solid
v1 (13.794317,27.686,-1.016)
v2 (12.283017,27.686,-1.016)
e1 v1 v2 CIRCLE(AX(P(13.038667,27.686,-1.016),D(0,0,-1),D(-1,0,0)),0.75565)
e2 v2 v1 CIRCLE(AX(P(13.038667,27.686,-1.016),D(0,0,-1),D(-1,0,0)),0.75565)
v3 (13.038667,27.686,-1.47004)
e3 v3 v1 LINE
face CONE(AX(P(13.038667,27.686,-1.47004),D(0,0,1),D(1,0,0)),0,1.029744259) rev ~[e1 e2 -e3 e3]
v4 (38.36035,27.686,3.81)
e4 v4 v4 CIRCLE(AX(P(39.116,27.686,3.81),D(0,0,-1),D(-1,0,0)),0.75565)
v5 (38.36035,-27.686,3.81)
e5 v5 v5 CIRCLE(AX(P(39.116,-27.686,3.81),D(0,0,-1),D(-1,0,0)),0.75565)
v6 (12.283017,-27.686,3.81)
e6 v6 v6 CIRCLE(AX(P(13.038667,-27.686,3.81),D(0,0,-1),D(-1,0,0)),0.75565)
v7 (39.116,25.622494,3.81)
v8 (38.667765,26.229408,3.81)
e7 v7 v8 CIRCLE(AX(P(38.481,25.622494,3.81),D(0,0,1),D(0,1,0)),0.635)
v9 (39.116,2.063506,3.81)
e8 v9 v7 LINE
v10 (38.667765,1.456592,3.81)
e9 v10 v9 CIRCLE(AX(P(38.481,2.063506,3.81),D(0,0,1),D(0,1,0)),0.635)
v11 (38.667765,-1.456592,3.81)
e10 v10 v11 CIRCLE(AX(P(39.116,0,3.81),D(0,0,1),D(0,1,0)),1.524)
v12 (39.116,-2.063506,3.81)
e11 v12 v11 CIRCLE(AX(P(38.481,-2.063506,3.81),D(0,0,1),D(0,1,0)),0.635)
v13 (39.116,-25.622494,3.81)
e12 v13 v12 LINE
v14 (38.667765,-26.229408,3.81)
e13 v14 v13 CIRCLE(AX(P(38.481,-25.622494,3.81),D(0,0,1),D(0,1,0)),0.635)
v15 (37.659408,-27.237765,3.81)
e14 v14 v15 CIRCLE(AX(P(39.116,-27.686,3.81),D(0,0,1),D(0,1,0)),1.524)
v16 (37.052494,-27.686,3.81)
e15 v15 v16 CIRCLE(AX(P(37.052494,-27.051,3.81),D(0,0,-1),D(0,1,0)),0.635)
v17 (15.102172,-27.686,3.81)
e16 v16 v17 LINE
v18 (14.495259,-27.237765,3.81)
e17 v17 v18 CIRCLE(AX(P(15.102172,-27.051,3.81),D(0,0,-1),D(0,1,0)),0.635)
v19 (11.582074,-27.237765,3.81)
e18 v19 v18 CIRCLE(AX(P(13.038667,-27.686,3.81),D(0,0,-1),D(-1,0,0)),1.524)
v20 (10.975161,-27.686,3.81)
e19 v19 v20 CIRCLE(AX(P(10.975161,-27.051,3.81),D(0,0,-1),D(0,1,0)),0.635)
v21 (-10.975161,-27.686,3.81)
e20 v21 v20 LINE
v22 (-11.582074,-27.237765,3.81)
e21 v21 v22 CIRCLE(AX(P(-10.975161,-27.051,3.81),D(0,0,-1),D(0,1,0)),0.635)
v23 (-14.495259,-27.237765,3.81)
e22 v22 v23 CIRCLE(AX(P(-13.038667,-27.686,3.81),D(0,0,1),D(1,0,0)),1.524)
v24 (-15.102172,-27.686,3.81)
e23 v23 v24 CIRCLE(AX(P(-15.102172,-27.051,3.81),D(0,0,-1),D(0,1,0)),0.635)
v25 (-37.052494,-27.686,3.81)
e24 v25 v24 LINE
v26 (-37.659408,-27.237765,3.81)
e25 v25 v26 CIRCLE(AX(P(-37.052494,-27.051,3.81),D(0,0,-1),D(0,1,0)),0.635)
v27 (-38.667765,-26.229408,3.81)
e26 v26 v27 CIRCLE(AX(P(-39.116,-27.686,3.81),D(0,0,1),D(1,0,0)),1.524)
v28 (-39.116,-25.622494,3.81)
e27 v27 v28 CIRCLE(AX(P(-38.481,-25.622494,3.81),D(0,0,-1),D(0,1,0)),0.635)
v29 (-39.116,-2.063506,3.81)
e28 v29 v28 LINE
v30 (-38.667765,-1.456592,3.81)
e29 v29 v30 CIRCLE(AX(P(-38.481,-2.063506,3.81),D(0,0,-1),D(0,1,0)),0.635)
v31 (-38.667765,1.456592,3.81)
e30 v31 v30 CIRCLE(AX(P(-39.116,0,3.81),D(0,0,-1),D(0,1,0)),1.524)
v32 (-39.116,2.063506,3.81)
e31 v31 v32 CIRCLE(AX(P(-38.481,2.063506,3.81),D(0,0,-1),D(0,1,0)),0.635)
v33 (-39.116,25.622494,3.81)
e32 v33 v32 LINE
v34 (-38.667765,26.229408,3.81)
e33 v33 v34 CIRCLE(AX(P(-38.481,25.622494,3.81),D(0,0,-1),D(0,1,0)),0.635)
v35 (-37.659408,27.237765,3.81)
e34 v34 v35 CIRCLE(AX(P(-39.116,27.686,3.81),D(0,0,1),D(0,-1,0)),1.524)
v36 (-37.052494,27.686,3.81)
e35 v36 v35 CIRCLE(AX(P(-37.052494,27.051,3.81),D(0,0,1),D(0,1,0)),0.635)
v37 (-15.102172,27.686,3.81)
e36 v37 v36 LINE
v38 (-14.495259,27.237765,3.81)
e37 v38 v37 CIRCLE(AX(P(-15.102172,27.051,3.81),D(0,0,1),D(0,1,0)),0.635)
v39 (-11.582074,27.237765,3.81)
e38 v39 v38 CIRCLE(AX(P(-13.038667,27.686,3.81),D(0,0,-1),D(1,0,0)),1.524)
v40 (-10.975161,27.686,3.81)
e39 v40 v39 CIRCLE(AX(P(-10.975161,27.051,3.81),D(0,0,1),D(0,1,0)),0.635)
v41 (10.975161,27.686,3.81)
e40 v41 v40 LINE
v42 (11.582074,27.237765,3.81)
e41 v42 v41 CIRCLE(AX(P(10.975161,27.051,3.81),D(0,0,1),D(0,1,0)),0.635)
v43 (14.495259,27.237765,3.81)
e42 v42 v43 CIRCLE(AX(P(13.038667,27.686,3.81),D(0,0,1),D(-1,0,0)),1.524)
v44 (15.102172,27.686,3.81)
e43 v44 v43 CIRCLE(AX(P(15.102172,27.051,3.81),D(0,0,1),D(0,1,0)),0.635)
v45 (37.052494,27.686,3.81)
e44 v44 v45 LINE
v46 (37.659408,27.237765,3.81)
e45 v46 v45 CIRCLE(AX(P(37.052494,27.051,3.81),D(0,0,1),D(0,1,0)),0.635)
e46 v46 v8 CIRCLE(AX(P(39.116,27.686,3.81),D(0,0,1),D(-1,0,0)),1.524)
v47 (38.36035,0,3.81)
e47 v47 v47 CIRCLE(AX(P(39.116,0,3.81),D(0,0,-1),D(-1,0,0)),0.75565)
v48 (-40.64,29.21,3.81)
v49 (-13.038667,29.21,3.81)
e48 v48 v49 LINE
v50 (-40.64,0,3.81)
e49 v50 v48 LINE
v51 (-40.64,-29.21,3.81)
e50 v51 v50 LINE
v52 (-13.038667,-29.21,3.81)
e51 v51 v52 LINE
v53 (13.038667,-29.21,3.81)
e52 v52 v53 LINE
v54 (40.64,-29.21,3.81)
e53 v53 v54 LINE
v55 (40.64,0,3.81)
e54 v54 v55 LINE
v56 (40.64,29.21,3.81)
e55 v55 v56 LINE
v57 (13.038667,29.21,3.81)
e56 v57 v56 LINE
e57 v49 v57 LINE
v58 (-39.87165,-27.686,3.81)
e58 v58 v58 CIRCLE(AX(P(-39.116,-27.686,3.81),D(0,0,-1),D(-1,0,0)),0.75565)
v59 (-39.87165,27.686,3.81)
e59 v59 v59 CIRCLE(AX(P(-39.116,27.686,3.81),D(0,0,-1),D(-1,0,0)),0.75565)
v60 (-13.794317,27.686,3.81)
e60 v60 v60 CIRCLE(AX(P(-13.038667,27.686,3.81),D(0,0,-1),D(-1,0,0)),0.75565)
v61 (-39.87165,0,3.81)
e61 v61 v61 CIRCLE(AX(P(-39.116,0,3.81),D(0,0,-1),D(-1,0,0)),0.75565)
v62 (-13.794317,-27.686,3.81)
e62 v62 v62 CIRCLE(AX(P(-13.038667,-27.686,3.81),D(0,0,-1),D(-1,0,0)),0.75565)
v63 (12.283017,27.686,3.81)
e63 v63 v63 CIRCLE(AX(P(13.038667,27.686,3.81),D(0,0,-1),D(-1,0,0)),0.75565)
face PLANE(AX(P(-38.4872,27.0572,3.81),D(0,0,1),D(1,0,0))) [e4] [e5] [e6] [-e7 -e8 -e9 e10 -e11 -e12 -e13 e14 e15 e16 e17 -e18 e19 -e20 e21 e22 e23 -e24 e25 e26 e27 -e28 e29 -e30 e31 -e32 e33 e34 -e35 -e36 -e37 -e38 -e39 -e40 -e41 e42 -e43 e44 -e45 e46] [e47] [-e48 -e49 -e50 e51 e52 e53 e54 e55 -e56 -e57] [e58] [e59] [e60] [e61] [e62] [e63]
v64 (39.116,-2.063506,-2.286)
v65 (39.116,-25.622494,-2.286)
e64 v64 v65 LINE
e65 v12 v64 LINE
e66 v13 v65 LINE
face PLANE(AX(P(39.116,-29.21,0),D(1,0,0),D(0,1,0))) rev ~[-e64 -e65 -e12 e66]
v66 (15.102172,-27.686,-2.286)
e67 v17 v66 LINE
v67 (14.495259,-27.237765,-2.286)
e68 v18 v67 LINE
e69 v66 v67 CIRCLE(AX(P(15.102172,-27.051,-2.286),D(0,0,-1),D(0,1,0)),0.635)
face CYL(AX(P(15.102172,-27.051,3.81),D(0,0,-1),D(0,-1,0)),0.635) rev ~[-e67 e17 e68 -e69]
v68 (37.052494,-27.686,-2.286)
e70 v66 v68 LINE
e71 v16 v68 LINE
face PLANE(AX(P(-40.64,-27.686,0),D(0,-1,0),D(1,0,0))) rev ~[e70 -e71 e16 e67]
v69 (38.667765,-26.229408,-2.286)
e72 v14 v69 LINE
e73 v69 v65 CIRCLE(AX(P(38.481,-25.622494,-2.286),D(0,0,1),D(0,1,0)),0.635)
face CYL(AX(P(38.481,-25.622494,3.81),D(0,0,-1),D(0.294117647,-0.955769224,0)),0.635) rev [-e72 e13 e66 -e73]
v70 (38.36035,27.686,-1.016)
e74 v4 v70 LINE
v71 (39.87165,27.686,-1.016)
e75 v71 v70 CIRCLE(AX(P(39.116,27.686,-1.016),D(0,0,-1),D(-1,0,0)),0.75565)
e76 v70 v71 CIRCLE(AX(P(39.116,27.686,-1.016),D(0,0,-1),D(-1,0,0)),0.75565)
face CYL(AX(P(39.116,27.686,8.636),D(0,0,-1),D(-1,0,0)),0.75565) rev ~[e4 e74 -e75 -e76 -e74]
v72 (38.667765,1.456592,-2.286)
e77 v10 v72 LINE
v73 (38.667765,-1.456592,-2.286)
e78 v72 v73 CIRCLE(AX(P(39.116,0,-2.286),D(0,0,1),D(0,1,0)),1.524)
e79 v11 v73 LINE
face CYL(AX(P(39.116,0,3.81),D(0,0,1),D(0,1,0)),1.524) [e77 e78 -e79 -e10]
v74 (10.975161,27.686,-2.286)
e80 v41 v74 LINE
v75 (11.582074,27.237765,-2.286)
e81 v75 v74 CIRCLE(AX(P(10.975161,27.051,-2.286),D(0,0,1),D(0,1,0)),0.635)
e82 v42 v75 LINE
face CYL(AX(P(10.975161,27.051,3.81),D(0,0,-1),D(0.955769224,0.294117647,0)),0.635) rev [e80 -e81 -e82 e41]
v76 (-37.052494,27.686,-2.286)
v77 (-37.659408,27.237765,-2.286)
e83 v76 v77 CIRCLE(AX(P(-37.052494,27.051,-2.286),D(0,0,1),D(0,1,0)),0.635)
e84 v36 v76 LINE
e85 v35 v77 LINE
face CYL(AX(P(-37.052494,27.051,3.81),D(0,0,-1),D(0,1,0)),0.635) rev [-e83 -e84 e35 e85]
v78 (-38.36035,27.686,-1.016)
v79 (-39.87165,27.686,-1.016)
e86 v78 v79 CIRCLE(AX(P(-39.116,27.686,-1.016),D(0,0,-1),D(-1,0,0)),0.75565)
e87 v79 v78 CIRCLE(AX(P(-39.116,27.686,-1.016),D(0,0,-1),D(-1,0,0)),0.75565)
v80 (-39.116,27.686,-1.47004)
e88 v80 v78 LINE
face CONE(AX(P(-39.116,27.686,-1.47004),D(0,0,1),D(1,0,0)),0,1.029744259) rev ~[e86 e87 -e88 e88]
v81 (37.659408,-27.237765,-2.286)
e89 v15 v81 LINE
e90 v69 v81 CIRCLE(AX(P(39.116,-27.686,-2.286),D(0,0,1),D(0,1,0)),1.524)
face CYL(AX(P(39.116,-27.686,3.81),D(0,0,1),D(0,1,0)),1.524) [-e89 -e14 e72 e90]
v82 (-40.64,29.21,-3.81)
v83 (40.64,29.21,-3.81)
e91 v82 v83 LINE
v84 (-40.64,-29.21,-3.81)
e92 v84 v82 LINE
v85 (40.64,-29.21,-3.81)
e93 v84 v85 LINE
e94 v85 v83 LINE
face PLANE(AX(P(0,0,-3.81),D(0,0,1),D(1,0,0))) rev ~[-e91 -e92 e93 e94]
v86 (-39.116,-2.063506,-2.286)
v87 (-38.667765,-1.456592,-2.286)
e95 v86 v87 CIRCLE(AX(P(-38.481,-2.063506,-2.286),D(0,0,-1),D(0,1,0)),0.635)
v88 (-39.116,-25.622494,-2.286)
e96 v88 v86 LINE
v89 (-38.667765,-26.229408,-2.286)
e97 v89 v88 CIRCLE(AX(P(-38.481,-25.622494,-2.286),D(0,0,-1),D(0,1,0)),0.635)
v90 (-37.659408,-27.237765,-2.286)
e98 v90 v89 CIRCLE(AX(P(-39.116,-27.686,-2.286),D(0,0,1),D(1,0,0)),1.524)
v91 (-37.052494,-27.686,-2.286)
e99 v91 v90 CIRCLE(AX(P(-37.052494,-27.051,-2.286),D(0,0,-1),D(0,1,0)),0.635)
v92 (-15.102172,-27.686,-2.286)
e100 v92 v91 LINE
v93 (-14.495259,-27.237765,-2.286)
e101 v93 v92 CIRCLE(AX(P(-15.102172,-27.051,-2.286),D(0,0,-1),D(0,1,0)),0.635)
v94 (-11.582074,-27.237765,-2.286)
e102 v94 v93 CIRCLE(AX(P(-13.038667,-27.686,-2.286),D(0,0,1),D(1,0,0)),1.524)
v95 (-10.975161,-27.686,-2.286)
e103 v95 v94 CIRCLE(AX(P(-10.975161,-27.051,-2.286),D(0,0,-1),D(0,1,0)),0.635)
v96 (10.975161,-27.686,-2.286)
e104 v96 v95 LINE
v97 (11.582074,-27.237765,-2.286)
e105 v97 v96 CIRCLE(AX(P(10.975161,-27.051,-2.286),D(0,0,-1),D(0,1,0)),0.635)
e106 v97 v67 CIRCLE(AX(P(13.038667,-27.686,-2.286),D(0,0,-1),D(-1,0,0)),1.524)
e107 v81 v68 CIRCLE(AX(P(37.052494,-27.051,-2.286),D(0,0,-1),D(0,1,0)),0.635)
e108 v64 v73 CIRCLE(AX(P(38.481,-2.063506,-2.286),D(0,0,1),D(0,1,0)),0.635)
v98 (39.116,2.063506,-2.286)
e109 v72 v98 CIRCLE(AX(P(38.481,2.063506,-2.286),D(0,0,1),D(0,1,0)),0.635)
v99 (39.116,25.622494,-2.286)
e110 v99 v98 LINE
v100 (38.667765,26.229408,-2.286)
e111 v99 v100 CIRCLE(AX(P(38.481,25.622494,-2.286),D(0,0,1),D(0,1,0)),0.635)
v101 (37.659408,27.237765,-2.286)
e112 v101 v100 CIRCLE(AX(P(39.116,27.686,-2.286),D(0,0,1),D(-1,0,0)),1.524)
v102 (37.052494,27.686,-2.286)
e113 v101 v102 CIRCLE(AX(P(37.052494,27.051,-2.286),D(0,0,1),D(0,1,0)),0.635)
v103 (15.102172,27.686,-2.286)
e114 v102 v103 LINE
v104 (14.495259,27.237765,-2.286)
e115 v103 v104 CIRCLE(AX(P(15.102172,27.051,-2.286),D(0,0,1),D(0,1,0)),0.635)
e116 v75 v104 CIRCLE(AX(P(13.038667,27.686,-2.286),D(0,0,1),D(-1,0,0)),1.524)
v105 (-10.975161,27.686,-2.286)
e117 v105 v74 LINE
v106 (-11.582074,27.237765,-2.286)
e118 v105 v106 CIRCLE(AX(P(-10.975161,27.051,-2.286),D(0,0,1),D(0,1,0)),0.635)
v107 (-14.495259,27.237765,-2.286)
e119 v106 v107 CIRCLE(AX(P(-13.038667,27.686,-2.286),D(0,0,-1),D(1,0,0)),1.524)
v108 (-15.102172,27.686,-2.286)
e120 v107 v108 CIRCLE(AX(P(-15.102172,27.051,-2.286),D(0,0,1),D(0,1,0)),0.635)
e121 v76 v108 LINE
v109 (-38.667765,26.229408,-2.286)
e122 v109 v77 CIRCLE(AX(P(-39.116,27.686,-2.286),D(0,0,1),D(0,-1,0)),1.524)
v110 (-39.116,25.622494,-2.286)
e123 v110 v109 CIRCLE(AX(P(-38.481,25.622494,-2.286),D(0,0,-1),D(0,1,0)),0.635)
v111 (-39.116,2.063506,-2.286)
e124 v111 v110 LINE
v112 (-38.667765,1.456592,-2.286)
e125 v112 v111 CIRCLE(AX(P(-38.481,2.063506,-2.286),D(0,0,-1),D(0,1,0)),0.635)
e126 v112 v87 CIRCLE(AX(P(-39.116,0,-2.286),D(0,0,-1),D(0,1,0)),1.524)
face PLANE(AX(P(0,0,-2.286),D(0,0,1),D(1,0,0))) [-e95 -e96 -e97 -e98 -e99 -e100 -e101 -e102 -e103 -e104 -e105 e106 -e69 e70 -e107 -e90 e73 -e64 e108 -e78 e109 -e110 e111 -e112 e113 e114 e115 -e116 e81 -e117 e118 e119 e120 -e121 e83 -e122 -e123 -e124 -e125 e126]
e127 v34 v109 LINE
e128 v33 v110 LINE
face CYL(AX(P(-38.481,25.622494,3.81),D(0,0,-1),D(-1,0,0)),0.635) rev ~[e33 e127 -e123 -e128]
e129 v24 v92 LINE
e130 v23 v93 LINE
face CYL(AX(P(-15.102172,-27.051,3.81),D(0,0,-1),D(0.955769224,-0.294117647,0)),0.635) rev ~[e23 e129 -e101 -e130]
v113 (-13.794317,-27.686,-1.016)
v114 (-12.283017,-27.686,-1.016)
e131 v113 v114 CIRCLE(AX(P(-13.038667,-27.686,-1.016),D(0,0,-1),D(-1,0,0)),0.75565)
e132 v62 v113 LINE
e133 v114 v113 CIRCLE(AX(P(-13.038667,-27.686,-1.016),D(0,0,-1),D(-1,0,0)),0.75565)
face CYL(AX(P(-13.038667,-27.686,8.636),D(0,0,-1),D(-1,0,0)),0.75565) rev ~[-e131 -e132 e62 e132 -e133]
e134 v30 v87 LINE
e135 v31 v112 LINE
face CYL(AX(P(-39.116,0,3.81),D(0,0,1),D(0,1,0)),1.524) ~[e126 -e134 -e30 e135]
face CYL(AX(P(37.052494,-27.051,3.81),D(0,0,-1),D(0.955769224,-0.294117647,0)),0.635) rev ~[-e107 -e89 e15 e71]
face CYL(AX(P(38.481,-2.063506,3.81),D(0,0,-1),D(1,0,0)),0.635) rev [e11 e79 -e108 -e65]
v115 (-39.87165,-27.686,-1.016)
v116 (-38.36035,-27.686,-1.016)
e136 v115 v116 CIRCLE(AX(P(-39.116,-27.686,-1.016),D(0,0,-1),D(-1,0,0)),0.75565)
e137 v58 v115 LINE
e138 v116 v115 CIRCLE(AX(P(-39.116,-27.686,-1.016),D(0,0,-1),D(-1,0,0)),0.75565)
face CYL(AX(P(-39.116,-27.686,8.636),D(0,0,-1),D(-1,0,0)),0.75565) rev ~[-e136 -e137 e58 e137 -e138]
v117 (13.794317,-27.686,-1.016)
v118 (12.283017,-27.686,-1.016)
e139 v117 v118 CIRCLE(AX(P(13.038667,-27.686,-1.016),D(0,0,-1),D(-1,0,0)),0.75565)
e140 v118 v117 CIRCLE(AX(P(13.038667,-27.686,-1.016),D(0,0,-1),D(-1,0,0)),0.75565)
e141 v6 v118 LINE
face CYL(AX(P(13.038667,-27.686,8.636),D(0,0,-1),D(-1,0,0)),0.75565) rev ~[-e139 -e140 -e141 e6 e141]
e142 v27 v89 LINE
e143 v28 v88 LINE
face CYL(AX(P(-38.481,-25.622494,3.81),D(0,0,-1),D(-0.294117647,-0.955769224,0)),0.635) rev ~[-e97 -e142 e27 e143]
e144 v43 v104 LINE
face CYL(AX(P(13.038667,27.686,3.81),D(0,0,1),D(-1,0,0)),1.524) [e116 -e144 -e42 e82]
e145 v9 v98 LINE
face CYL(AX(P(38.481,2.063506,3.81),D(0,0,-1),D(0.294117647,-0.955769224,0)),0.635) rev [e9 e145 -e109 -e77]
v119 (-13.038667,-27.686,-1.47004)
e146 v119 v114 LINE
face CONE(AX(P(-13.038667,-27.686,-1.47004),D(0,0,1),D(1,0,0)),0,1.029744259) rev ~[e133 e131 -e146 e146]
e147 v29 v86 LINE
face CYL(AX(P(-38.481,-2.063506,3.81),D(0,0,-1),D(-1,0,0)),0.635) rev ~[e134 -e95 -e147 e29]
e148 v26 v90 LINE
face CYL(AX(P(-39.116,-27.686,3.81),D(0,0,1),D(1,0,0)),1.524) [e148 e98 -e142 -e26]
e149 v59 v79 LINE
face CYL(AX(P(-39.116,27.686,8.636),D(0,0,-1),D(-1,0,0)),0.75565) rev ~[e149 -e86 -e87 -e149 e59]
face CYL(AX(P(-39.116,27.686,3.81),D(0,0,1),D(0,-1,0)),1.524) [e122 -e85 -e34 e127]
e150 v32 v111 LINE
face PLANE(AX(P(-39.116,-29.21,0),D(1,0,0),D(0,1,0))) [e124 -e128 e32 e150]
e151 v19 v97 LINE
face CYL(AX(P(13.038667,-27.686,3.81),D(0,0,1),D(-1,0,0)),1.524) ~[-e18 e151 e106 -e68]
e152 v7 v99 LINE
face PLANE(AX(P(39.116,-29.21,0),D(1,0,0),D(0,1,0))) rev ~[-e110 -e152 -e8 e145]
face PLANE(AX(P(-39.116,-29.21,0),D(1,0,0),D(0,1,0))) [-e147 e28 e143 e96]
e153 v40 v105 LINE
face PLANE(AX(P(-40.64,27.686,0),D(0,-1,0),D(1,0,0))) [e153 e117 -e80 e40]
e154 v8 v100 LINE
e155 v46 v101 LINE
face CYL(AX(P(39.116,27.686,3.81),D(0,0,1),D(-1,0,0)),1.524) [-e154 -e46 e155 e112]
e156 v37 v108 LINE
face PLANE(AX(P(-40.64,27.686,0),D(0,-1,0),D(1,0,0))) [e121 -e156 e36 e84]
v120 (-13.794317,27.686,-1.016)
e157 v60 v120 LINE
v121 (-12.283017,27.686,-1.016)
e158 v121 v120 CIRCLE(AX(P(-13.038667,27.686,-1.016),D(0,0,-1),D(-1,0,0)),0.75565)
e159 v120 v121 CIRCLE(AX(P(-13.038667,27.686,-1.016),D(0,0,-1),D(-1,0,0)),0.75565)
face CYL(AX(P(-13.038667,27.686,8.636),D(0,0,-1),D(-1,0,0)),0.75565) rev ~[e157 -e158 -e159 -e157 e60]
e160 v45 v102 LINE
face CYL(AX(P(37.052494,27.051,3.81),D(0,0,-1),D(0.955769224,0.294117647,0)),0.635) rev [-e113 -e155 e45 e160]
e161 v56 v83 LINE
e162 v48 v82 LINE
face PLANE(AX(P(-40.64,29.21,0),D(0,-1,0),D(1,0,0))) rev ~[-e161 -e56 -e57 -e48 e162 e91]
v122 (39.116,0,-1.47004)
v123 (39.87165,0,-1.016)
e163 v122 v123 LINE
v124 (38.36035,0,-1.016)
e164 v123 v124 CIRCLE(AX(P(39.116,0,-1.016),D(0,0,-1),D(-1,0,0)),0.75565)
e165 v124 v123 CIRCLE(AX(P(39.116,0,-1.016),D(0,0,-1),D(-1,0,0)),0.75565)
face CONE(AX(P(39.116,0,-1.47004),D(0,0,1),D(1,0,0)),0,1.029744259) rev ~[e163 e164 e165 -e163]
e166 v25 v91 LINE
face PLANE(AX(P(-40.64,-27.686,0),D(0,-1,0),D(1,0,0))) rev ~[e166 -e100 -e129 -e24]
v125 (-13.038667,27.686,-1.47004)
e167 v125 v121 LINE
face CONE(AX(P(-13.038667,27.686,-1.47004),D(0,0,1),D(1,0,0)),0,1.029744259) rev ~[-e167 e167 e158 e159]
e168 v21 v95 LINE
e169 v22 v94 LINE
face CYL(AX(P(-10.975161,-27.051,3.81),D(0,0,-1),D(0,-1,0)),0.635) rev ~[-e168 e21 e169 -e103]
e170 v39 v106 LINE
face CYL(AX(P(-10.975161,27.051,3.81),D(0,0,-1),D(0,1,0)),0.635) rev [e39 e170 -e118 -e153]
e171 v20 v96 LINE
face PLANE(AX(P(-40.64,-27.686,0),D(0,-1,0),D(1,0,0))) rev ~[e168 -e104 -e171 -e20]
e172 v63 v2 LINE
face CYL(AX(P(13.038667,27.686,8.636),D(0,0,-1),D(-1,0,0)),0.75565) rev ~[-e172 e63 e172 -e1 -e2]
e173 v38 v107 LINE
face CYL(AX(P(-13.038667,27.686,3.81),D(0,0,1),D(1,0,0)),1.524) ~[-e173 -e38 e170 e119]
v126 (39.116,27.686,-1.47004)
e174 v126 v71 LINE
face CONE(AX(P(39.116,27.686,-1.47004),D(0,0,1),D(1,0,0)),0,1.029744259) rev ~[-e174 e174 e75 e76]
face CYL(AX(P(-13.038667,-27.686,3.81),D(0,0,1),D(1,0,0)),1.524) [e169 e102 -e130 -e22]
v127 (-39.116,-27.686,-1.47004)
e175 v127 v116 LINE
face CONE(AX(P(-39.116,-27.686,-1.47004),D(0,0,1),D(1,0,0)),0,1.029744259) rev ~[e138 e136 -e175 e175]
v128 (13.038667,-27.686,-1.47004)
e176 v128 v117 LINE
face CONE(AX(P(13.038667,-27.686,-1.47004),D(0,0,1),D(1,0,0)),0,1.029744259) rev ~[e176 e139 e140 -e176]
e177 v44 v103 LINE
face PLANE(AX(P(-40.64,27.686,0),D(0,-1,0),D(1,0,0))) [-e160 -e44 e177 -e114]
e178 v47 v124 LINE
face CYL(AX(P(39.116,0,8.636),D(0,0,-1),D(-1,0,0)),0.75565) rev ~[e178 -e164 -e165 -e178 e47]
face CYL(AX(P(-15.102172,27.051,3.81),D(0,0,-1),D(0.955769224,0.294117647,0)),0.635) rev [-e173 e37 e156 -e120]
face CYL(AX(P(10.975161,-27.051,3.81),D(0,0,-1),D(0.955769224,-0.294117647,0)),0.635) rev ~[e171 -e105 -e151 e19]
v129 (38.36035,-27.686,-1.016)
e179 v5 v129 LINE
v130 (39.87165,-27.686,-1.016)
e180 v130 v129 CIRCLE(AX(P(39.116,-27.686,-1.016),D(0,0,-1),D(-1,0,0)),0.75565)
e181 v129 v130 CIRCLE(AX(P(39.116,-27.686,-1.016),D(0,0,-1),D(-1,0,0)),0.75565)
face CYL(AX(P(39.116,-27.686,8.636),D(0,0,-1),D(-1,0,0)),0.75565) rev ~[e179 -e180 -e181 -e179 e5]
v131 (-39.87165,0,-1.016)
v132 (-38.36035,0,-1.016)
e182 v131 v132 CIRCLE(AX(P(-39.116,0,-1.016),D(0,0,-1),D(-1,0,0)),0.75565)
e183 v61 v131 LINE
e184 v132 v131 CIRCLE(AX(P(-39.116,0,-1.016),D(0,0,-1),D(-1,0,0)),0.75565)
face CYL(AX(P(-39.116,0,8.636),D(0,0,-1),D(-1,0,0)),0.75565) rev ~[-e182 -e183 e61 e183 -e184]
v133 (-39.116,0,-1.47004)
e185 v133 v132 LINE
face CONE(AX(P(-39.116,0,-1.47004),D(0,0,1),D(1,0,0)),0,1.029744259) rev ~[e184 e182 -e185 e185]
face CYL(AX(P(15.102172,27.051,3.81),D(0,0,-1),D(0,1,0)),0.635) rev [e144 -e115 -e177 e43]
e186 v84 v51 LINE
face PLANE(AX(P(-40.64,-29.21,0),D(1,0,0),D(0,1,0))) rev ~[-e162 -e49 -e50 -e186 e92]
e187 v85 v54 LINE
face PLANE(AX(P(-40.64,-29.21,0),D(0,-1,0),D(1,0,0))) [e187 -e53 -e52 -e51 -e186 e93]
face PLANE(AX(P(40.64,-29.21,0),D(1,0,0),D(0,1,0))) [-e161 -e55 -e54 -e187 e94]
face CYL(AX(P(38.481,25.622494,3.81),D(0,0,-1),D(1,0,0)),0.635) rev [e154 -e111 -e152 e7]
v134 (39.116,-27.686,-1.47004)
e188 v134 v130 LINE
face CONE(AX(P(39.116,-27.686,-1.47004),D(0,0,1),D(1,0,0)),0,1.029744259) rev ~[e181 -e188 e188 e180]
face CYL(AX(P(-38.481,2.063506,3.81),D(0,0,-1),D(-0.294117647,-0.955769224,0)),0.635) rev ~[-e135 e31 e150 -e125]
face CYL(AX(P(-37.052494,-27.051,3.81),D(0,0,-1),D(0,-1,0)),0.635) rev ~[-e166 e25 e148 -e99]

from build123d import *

# Parameters (mm, degrees)
F0_W             = 81.28
F0_H             = 58.42
F1_DEPTH         = 3.81
F2_T             = -1.524
F4_DEPTH         = 6.096
F4_COPIES2_COUNT = 2
F6_D             = 1.5113
F6_DEPTH         = 4.826
F6_TIP           = 0.4540403268
F7_R             = 0.635


# Not quite as in the source:
# - a pattern or mirror of a feature is missing from the dataset's text; its kind, count and spacing are read off the source's solid


with BuildPart() as f1:
    # F0 (on Top) → F1 (new body, symmetric)
    with BuildSketch(Plane.XY):
        Rectangle(F0_W, F0_H)
    extrude(amount=F1_DEPTH, both=True)

    # F2
    f2_openings = [f1.faces().sort_by_distance(p)[0] for p in [
        (0, 0, 3.81),
    ]]
    offset(amount=F2_T, openings=f2_openings)

    # F3 (on face) → F4 (join, through all)
    with BuildSketch(Plane.XY.offset(3.81)):
        with BuildLine():
            ThreePointArc((-39.116, 26.162), (-38.0383692655, 26.6083692655), (-37.592, 27.686))
            Line((-37.592, 27.686), (-39.116, 27.686))
            Line((-39.116, 27.686), (-39.116, 26.162))
        make_face()
        with BuildLine():
            ThreePointArc((-13.0386666835, 29.21), (-14.1162974072, 28.7636307286), (-14.5626666667, 27.686))
            Line((-14.5626666667, 27.686), (-11.5146666667, 27.686))
            ThreePointArc((-11.5146666667, 27.686), (-11.9610359381, 28.7636307405), (-13.0386666835, 29.21))
        make_face()
        with BuildLine():
            Line((-39.116, -1.524), (-39.116, 1.524))
            ThreePointArc((-39.116, 1.524), (-40.1936307323, 1.0776307368), (-40.64, 6.4e-09))
            ThreePointArc((-40.64, 6.4e-09), (-40.1936307368, -1.0776307323), (-39.116, -1.524))
        make_face()
        with BuildLine():
            ThreePointArc((14.5626666667, 27.686), (14.1162974012, 28.7636307345), (13.0386666667, 29.21))
            ThreePointArc((13.0386666667, 29.21), (11.9610359321, 28.7636307345), (11.5146666667, 27.686))
            Line((11.5146666667, 27.686), (14.5626666667, 27.686))
        make_face()
        with BuildLine():
            Line((14.5626666667, 27.686), (11.5146666667, 27.686))
            ThreePointArc((11.5146666667, 27.686), (13.0386666667, 26.162), (14.5626666667, 27.686))
        make_face()
        with BuildLine():
            ThreePointArc((-37.592, -27.686), (-38.0383692655, -26.6083692655), (-39.116, -26.162))
            Line((-39.116, -26.162), (-39.116, -27.686))
            Line((-39.116, -27.686), (-37.592, -27.686))
        make_face()
        with BuildLine():
            Line((39.116, 27.686), (37.592, 27.686))
            ThreePointArc((37.592, 27.686), (38.0383692655, 26.6083692655), (39.116, 26.162))
            Line((39.116, 26.162), (39.116, 27.686))
        make_face()
        with BuildLine():
            ThreePointArc((-14.5626666667, -27.686), (-14.1162973989, -28.7636307368), (-13.0386666602, -29.21))
            ThreePointArc((-13.0386666602, -29.21), (-11.9610359299, -28.7636307323), (-11.5146666667, -27.686))
            Line((-11.5146666667, -27.686), (-14.5626666667, -27.686))
        make_face()
        with BuildLine():
            ThreePointArc((11.5146666667, -27.686), (11.9610359295, -28.7636307319), (13.0386666593, -29.21))
            ThreePointArc((13.0386666593, -29.21), (14.1162973986, -28.7636307371), (14.5626666667, -27.686))
            Line((14.5626666667, -27.686), (11.5146666667, -27.686))
        make_face()
        with BuildLine():
            Line((39.116, -1.524), (39.116, 1.524))
            ThreePointArc((39.116, 1.524), (37.592, 0), (39.116, -1.524))
        make_face()
        with BuildLine():
            Line((39.116, -27.686), (39.116, -26.162))
            ThreePointArc((39.116, -26.162), (38.0383692655, -26.6083692655), (37.592, -27.686))
            Line((37.592, -27.686), (39.116, -27.686))
        make_face()
    f4 = extrude(amount=-F4_DEPTH)

    # F4_copies: F4 across plane
    add(f4.mirror(Plane(origin=(0, 0, 0), x_dir=(0, 0, -1), z_dir=(-1, 0, 0))))

    # F4_copies1: F4 across plane
    add(f4.mirror(Plane(origin=(0, 0, 0), x_dir=(0, 0, -1), z_dir=(0, -1, 0))))

    # F4_copies2: F4 ×2 about axis
    f4_copies2_axis = Axis((0, 0, 0), (0, 0, 1))
    for i in range(1, F4_COPIES2_COUNT):
        add(f4.rotate(f4_copies2_axis, i * 360 / F4_COPIES2_COUNT))

    # F6
    with Locations(Plane.XY.offset(3.81)):
        with Locations((-39.116, 27.686), (-13.0386666667, 27.686), (13.0386666667, 27.686), (39.116, 27.686), (39.116, 0), (39.116, -27.686), (13.0386666667, -27.686), (-13.0386666667, -27.686), (-39.116, -27.686), (-39.116, 0)):
            Hole(F6_D / 2, depth=F6_DEPTH)
            with Locations((0, 0, -(F6_DEPTH + F6_TIP / 2))):  # 118° drill point
                Cone(0, F6_D / 2, F6_TIP, mode=Mode.SUBTRACT)

    # F7
    f7_edges = [f1.edges().sort_by_distance(p)[0] for p in [
        (-37.592, 27.686, 0.762),
        (-11.514667, 27.686, 0.762),
        (14.562667, 27.686, 0.762),
        (37.592, 27.686, 0.762),
        (40.64, 0, 0.762),
        (39.116, -26.162, 0.762),
        (37.592, -27.686, 0.762),
        (14.562667, -27.686, 0.762),
        (-11.514667, -27.686, 0.762),
        (-37.592, -27.686, 0.762),
        (39.116, 26.162, 0.762),
        (39.116, 1.524, 0.762),
        (39.116, -1.524, 0.762),
        (11.514667, 27.686, 0.762),
        (11.514667, -27.686, 0.762),
        (-14.562667, 27.686, 0.762),
        (-14.562667, -27.686, 0.762),
        (-39.116, 26.162, 0.762),
        (-39.116, 1.524, 0.762),
        (-39.116, -26.162, 0.762),
        (-39.116, -1.524, 0.762),
    ]]
    fillet(f7_edges, radius=F7_R)


solid = f1.part
